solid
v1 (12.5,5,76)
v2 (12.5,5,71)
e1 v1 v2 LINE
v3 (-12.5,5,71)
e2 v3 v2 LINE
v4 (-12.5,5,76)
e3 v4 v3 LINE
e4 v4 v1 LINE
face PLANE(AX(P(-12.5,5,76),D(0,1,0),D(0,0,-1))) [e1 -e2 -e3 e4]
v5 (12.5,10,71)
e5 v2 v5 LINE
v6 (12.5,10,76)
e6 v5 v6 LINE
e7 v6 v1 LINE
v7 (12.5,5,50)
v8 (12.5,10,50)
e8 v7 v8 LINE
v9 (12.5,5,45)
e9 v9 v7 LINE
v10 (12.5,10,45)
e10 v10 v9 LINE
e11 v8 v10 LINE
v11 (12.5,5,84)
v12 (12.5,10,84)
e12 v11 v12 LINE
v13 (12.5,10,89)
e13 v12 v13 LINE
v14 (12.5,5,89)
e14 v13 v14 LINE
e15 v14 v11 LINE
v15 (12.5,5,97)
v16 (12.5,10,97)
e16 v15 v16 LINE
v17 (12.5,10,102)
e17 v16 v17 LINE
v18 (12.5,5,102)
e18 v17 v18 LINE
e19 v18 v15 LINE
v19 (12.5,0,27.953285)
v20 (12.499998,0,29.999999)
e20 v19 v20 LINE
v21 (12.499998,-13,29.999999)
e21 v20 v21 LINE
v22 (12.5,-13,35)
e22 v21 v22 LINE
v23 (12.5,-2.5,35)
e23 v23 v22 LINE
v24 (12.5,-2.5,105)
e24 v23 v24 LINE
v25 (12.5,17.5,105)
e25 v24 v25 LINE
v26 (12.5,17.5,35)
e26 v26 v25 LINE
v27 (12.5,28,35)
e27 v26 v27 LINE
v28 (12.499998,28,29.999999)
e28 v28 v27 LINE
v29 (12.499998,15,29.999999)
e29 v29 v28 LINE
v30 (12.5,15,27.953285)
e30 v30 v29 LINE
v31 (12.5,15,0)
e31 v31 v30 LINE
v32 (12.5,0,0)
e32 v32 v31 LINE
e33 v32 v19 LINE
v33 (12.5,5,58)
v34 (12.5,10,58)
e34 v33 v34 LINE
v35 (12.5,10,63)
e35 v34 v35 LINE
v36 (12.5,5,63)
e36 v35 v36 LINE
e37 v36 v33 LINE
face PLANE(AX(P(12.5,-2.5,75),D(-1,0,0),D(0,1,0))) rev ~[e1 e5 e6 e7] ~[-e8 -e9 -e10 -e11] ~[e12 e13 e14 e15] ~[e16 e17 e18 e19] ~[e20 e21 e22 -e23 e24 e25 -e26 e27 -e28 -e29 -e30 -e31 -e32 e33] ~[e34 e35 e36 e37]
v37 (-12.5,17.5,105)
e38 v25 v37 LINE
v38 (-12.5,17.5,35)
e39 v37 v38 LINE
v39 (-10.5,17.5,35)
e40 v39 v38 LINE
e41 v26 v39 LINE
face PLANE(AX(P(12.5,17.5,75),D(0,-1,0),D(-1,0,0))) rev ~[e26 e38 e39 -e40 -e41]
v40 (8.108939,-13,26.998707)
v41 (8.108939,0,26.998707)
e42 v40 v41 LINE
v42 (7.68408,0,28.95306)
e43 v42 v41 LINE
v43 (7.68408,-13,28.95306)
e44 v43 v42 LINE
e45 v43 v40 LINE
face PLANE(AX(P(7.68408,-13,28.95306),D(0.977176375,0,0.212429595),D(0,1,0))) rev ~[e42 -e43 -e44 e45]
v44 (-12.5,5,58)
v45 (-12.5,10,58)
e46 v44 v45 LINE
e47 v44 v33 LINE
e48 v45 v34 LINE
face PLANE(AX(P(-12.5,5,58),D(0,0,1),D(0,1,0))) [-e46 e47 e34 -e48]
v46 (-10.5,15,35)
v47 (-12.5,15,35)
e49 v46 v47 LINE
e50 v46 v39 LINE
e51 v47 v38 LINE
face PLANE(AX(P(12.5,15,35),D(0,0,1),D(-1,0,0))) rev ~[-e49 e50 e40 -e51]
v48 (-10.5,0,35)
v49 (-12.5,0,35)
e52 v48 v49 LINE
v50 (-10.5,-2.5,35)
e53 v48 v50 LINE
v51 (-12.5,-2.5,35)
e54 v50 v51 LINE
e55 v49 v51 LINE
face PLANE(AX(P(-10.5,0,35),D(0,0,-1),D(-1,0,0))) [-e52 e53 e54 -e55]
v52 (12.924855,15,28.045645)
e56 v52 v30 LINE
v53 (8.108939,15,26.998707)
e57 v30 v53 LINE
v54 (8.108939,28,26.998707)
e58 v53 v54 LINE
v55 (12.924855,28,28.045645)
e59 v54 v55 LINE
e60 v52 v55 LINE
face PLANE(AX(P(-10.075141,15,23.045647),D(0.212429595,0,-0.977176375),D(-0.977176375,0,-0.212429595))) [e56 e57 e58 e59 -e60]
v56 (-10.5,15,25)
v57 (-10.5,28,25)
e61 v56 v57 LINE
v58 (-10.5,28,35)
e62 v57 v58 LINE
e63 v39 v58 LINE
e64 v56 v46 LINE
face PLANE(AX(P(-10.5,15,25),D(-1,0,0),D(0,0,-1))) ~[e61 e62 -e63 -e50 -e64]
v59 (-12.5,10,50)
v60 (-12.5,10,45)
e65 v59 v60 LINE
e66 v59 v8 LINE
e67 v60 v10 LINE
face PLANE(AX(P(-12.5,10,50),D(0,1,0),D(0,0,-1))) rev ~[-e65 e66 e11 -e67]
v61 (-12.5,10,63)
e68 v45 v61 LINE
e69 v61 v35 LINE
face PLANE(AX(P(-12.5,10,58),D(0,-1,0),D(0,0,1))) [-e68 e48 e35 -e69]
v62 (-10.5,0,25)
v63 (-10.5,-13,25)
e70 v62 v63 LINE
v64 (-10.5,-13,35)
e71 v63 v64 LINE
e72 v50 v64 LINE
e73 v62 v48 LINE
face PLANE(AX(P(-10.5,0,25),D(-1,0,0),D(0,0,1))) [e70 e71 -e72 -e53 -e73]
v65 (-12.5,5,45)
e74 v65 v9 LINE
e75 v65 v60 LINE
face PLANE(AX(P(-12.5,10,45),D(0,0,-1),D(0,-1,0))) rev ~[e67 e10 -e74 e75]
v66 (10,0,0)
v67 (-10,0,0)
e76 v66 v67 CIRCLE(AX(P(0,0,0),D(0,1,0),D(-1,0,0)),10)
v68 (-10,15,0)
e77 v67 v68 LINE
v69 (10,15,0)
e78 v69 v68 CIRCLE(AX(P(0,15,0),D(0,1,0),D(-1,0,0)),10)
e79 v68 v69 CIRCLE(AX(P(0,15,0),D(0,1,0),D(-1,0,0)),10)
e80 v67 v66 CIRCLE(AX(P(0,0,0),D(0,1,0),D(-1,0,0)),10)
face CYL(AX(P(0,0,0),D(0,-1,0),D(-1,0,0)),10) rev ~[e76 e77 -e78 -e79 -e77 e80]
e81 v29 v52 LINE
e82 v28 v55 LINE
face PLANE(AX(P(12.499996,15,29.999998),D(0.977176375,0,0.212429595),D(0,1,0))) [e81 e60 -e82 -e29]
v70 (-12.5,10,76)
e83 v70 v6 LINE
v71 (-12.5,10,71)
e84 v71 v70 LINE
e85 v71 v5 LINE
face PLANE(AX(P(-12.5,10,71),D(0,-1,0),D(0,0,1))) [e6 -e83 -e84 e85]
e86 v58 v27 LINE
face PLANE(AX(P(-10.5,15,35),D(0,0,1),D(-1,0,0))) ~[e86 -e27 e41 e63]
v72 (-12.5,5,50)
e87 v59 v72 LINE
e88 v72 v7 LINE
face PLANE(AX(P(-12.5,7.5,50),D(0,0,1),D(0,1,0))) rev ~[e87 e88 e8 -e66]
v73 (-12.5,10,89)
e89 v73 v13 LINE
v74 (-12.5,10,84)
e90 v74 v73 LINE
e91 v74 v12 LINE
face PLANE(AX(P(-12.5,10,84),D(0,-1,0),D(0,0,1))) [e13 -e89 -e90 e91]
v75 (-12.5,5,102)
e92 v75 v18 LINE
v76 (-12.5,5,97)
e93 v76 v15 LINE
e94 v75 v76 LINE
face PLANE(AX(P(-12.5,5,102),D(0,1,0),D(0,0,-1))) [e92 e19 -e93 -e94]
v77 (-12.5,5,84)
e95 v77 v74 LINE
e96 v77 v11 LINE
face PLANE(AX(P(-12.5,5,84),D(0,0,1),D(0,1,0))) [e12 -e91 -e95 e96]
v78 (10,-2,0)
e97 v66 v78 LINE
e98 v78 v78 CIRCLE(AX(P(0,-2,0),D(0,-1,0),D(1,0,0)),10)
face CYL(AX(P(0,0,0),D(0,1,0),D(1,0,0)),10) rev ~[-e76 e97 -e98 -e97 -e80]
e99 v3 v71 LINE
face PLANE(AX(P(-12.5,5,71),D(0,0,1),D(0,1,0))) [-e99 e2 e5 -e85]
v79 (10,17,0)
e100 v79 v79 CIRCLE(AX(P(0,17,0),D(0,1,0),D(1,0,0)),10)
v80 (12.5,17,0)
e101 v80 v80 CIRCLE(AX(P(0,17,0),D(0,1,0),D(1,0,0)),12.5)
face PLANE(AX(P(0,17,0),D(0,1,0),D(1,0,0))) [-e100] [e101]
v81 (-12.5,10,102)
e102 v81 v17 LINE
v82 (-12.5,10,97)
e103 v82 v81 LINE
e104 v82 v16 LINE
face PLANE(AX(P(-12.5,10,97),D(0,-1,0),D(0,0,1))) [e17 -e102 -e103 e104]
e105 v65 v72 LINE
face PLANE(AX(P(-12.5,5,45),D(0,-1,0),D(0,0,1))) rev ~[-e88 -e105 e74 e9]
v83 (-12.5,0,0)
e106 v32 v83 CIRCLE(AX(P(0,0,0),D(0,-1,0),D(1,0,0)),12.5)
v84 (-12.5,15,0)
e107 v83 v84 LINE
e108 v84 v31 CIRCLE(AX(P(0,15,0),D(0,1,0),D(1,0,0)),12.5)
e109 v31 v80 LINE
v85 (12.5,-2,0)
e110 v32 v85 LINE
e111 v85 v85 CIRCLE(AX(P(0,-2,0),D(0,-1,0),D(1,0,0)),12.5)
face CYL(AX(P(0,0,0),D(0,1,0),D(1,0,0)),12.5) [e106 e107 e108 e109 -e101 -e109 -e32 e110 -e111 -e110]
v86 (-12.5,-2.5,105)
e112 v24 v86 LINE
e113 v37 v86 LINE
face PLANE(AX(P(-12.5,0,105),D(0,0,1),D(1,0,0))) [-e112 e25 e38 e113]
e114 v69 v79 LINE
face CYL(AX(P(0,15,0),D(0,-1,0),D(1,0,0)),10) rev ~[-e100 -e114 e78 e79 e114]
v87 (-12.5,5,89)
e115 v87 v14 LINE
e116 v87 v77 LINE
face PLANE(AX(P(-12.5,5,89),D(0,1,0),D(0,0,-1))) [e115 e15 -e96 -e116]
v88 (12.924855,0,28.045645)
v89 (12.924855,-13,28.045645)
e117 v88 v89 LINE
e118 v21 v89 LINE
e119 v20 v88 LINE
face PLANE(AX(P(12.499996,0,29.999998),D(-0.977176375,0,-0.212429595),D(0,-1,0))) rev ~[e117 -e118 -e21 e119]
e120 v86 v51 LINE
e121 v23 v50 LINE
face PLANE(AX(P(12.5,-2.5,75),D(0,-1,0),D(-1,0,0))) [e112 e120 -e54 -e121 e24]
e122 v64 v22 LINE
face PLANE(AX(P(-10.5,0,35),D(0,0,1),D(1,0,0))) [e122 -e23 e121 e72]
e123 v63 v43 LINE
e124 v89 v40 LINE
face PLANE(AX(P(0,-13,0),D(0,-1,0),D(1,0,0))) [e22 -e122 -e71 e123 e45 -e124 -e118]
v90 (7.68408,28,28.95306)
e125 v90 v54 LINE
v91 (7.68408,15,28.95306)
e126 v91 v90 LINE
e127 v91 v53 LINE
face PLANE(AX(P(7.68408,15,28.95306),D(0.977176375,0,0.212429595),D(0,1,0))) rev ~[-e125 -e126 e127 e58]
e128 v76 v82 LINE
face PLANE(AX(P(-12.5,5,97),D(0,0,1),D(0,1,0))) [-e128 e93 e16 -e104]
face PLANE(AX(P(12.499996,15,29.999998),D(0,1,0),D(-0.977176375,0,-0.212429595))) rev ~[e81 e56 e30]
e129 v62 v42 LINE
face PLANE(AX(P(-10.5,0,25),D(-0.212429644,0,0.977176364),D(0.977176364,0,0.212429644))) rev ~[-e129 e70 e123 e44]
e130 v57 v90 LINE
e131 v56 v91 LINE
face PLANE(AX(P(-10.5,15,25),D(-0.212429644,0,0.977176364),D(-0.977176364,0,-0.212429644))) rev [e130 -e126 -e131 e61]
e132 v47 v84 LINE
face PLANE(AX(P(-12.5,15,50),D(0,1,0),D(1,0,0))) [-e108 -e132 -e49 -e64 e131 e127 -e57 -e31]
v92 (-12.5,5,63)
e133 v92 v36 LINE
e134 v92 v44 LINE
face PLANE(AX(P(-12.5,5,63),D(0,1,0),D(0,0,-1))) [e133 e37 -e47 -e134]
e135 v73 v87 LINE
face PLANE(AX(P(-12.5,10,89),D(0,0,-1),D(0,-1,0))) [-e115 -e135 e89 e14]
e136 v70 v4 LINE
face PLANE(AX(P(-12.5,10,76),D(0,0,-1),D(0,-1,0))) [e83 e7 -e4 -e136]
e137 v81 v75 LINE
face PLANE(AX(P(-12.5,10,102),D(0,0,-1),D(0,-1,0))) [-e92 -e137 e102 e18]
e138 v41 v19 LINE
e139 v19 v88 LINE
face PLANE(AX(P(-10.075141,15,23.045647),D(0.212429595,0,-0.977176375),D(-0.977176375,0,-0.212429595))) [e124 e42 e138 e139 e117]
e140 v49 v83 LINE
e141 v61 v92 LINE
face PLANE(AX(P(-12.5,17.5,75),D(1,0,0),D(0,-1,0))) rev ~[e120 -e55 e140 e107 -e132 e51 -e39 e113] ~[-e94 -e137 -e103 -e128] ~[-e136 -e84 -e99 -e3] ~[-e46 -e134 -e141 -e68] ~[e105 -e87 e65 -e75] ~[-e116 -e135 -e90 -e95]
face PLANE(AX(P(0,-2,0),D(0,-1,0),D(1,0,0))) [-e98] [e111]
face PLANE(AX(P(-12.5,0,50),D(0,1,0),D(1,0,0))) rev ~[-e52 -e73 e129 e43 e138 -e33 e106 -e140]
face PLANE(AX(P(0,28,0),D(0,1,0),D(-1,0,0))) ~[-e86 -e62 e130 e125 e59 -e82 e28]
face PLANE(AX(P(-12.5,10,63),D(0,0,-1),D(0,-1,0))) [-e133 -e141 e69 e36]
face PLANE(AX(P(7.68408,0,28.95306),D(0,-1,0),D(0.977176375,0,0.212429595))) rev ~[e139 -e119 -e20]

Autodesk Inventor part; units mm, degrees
ref_plane "YZ Plane" through (0, 0, 0) normal (1, 0, 0) x (0, 1, 0)
ref_plane "XY Plane" through (0, 0, 0) normal (0, 0, 1) x (1, 0, 0)
sketch "Sketch1" plane through (0, 0, 0) normal (0, 1, 0) x (-1, 0, 0)
  circle A0 centre (0, 0) radius 10
  circle A1 centre (0, 0) radius 12.5
  line L0 (12.5, 0) -> (12.5, 50)
  line L1 (-12.5, 0) -> (-12.5, 50)
  line L2 (-12.5, 50) -> (12.5, 50)
  dimension "d0" = 20
  dimension "d1" = 25
  dimension "d2" = 50
extrude "Extrusion1" add sketch "Sketch1" along normal blind 15
sketch "Sketch3" plane through (-12.5, 0, 50) normal (0, 0, 1) x (1, 0, 0)
  point P0 (12.5, 0)
sketch "Sketch4" plane through (-12.5, 0, 50) normal (0, 0, 1) x (1, 0, 0)
  line L0 (25, 0) -> (25, 15) projected
  line L1 (25, 0) -> (25, 15)
  line L2 (0, 15) -> (25, 15) projected
  line L3 (25, 15) -> (0, 15)
  line L4 (0, 0) -> (0, 15) projected
  line L5 (0, 15) -> (0, 0)
  line L6 (0, 0) -> (25, 0) projected
  line L7 (0, 0) -> (25, 0)
  point P0 (12.5, 0)
extrude "Extrusion3" add sketch "Sketch4" along normal blind 25
sketch "Sketch9" plane through (0, 0, 0) normal (0, -1, 0) x (1, 0, 0)
  line L0 (-12.5, 25) -> (-22.5, 25) projected
  line L1 (-12.5, 25) -> (12.5, 25)
  line L2 (12.5, 0) -> (12.5, 75) projected
  line L3 (-12.5, 25) -> (-12.5, 75) projected
  line L4 (-12.5, 25) -> (-12.5, 75)
  line L5 (-12.5, 75) -> (12.5, 75) projected
  line L6 (-12.5, 75) -> (12.5, 75)
  line L7 (12.5, 75) -> (12.5, 25)
  line L8 (12.5, 0) -> (12.5, 30)
  line L9 (-12.5, 25) -> (-10.5, 25)
  line L10 (-10.5, 25) -> (-10.5, 75)
  line L11 (-12.5, 75) -> (-12.5, 25)
  line L12 (-10.5, 25) -> (12.5, 30)
  line L13 (-10.5, 25) -> (-10.5, 35)
  line L14 (-10.5, 35) -> (12.5, 35)
  point P0 (0, 0)
  point P1 (12.5, 35)
  dimension "d50" = 30
  dimension "d51" = 2
  dimension "d74" = 10
extrude "Extrusion7" add sketch "Sketch9" along normal blind 13 contours L10 L14 L2 L12
sketch "Sketch10" plane through (0, -13, 0) normal (0, -1, 0) x (1, 0, 0)
  point P0 (0, 0)
ref_plane "Work Plane1" through (0, 7.5, 0) normal (0, 1, 0) x (-1, 0, 0)
mirror "Mirror1" about plane through (0, 7.5, 0) normal (0, 1, 0) of "Extrusion7"
sketch "Sketch15" plane through (-10.5, 15, 25) normal (0.2124296, 0, -0.9771764) x (-0.9771764, 0, -0.2124296)
  line L0 (-23.5372, 0) -> (-23.5372, 13) projected
  line L1 (-14.7001, 13) -> (-18.6088, 13) projected
  line L2 (-23.5372, 0) -> (-18.5372, 0)
  line L3 (-18.5372, 0) -> (-18.5372, 13)
  line L4 (-18.5372, 13) -> (-23.5372, 13)
  line L5 (-23.5372, 13) -> (-23.5372, 0)
  line L6 (-23.5372, -28) -> (-24.5994, -28) projected
  line L7 (-18.6088, -28) -> (-18.6088, 13) projected
  line L8 (-23.5372, -28) -> (-18.6088, -28)
  line L9 (-18.6088, -28) -> (-18.6088, -15)
  line L10 (-18.6088, -15) -> (-23.5372, -15)
  line L11 (-23.5372, -15) -> (-23.5372, -28)
  point P0 (-4.9496, -15)
  point P1 (-33.0965, -28)
  point P2 (-18.6088, 0)
  point P3 (-23.5372, 13)
  dimension "d66" = 5
extrude "Extrusion9" add sketch "Sketch15" along normal blind 2 contours L0 L4 L7 L2 | L8 L11 L10 L7
sketch "Sketch16" plane through (0, 15, 0) normal (0, 1, 0) x (1, 0, 0)
  circle A0 centre (0, 0) radius 10
  circle A1 centre (0, 0) radius 12.5
  dimension "d69" = 25
extrude "Extrusion10" add sketch "Sketch16" along normal blind 2
sketch "Sketch17" plane through (0, 0, 0) normal (0, -1, 0) x (1, 0, 0)
  circle A0 centre (0, 0) radius 10
  circle A1 centre (0, 0) radius 10 projected
  circle A2 centre (0, 0) radius 12.5
extrude "Extrusion11" add sketch "Sketch17" along normal blind 2
sketch "Sketch18" plane through (-12.5, 0, 0) normal (-1, 0, 0) x (0, 0, 1)
  point P0 (0, 0)
sketch "Sketch19" plane through (0, 0, 0) normal (0, -1, 0) x (1, 0, 0)
  line L0 (-12.5, 75) -> (12.5, 75) projected
  line L1 (12.5, 35) -> (-10.5, 35) projected
  line L2 (-12.5, 75) -> (12.5, 75)
  line L3 (12.5, 75) -> (12.5, 35)
  line L4 (12.5, 35) -> (-12.5, 35)
  line L5 (-12.5, 35) -> (-12.5, 75)
  point P0 (0, 0)
extrude "Extrusion12" add sketch "Sketch19" along normal blind 2.5
sketch "Sketch20" plane through (0, 15, 0) normal (0, 1, 0) x (1, 0, 0)
  line L0 (12.5, -75) -> (-12.5, -75) projected
  line L1 (12.5, -35) -> (12.5, -75) projected
  line L2 (-12.5, -75) -> (12.5, -75)
  line L3 (12.5, -75) -> (12.5, -35)
  line L4 (12.5, -35) -> (-12.5, -35)
  line L5 (-12.5, -35) -> (-12.5, -75)
  point P0 (0, 0)
extrude "Extrusion13" add sketch "Sketch20" along normal blind 2.5
sketch "Sketch21" plane through (-12.5, 0, 75) normal (0, 0, 1) x (1, 0, 0)
  line L0 (25, -2.5) -> (0, -2.5) projected
  line L1 (0, -2.5) -> (25, -2.5)
  line L2 (25, -2.5) -> (25, 17.5)
  line L3 (25, 17.5) -> (0, 17.5)
  line L4 (0, 17.5) -> (0, -2.5)
  point P0 (12.5, 0)
extrude "Extrusion14" add sketch "Sketch21" along normal blind 30
sketch "Sketch22" plane through (-12.5, 0, 0) normal (-1, 0, 0) x (0, 0, 1)
  line L0 (35, 15) -> (35, 17.5) projected
  line L1 (35, -2.5) -> (105, -2.5) projected
  line L2 (35, 17.5) -> (45, 17.5)
  line L3 (45, 17.5) -> (45, -2.5)
  line L4 (45, -2.5) -> (35, -2.5)
  line L5 (35, -2.5) -> (35, 17.5)
  line L6 (45, 7.5) -> (50, 7.5)
  line L7 (45, 5) -> (50, 5)
  line L8 (50, 5) -> (50, 10)
  line L9 (50, 10) -> (45, 10)
  line L10 (45, 10) -> (45, 5)
  line L11 (45, 5) -> (50, 10) construction
  line L12 (50, 5) -> (45, 10) construction
  line L13 (50, 7.5) -> (58, 7.5)
  line L14 (63, 5) -> (58, 5)
  line L15 (58, 5) -> (58, 10)
  line L16 (58, 10) -> (63, 10)
  line L17 (63, 10) -> (63, 5)
  line L18 (63, 5) -> (58, 10) construction
  line L19 (58, 5) -> (63, 10) construction
  line L20 (63, 7.5) -> (71, 7.5)
  line L21 (76, 5) -> (71, 5)
  line L22 (71, 5) -> (71, 10)
  line L23 (71, 10) -> (76, 10)
  line L24 (76, 10) -> (76, 5)
  line L25 (76, 5) -> (71, 10) construction
  line L26 (71, 5) -> (76, 10) construction
  line L27 (76, 7.5) -> (84, 7.5)
  line L28 (89, 5) -> (84, 5)
  line L29 (84, 5) -> (84, 10)
  line L30 (84, 10) -> (89, 10)
  line L31 (89, 10) -> (89, 5)
  line L32 (89, 5) -> (84, 10) construction
  line L33 (84, 5) -> (89, 10) construction
  line L34 (89, 7.5) -> (97, 7.5)
  line L35 (102, 5) -> (97, 5)
  line L36 (97, 5) -> (97, 10)
  line L37 (97, 10) -> (102, 10)
  line L38 (102, 10) -> (102, 5)
  line L39 (102, 5) -> (97, 10) construction
  line L40 (97, 5) -> (102, 10) construction
  point P0 (0, 0)
  point P1 (47.5, 7.5)
  point P2 (60.5, 7.5)
  point P3 (73.5, 7.5)
  point P4 (86.5, 7.5)
  point P5 (99.5, 7.5)
  dimension "d81" = 10
  dimension "d82" = 5
  dimension "d83" = 5
  dimension "d84" = 8
  dimension "d85" = 5
  dimension "d86" = 8
  dimension "d87" = 8
  dimension "d88" = 8
extrude "Extrusion15" cut sketch "Sketch22" against normal blind 30 contours L9 L8 L6 L3 | L3 L6 L8 L7 | L14 L15 L16 L17 | L21 L22 L23 L24 | L28 L29 L30 L31 | L35 L36 L37 L38
properties part number "Part10copycopy"
